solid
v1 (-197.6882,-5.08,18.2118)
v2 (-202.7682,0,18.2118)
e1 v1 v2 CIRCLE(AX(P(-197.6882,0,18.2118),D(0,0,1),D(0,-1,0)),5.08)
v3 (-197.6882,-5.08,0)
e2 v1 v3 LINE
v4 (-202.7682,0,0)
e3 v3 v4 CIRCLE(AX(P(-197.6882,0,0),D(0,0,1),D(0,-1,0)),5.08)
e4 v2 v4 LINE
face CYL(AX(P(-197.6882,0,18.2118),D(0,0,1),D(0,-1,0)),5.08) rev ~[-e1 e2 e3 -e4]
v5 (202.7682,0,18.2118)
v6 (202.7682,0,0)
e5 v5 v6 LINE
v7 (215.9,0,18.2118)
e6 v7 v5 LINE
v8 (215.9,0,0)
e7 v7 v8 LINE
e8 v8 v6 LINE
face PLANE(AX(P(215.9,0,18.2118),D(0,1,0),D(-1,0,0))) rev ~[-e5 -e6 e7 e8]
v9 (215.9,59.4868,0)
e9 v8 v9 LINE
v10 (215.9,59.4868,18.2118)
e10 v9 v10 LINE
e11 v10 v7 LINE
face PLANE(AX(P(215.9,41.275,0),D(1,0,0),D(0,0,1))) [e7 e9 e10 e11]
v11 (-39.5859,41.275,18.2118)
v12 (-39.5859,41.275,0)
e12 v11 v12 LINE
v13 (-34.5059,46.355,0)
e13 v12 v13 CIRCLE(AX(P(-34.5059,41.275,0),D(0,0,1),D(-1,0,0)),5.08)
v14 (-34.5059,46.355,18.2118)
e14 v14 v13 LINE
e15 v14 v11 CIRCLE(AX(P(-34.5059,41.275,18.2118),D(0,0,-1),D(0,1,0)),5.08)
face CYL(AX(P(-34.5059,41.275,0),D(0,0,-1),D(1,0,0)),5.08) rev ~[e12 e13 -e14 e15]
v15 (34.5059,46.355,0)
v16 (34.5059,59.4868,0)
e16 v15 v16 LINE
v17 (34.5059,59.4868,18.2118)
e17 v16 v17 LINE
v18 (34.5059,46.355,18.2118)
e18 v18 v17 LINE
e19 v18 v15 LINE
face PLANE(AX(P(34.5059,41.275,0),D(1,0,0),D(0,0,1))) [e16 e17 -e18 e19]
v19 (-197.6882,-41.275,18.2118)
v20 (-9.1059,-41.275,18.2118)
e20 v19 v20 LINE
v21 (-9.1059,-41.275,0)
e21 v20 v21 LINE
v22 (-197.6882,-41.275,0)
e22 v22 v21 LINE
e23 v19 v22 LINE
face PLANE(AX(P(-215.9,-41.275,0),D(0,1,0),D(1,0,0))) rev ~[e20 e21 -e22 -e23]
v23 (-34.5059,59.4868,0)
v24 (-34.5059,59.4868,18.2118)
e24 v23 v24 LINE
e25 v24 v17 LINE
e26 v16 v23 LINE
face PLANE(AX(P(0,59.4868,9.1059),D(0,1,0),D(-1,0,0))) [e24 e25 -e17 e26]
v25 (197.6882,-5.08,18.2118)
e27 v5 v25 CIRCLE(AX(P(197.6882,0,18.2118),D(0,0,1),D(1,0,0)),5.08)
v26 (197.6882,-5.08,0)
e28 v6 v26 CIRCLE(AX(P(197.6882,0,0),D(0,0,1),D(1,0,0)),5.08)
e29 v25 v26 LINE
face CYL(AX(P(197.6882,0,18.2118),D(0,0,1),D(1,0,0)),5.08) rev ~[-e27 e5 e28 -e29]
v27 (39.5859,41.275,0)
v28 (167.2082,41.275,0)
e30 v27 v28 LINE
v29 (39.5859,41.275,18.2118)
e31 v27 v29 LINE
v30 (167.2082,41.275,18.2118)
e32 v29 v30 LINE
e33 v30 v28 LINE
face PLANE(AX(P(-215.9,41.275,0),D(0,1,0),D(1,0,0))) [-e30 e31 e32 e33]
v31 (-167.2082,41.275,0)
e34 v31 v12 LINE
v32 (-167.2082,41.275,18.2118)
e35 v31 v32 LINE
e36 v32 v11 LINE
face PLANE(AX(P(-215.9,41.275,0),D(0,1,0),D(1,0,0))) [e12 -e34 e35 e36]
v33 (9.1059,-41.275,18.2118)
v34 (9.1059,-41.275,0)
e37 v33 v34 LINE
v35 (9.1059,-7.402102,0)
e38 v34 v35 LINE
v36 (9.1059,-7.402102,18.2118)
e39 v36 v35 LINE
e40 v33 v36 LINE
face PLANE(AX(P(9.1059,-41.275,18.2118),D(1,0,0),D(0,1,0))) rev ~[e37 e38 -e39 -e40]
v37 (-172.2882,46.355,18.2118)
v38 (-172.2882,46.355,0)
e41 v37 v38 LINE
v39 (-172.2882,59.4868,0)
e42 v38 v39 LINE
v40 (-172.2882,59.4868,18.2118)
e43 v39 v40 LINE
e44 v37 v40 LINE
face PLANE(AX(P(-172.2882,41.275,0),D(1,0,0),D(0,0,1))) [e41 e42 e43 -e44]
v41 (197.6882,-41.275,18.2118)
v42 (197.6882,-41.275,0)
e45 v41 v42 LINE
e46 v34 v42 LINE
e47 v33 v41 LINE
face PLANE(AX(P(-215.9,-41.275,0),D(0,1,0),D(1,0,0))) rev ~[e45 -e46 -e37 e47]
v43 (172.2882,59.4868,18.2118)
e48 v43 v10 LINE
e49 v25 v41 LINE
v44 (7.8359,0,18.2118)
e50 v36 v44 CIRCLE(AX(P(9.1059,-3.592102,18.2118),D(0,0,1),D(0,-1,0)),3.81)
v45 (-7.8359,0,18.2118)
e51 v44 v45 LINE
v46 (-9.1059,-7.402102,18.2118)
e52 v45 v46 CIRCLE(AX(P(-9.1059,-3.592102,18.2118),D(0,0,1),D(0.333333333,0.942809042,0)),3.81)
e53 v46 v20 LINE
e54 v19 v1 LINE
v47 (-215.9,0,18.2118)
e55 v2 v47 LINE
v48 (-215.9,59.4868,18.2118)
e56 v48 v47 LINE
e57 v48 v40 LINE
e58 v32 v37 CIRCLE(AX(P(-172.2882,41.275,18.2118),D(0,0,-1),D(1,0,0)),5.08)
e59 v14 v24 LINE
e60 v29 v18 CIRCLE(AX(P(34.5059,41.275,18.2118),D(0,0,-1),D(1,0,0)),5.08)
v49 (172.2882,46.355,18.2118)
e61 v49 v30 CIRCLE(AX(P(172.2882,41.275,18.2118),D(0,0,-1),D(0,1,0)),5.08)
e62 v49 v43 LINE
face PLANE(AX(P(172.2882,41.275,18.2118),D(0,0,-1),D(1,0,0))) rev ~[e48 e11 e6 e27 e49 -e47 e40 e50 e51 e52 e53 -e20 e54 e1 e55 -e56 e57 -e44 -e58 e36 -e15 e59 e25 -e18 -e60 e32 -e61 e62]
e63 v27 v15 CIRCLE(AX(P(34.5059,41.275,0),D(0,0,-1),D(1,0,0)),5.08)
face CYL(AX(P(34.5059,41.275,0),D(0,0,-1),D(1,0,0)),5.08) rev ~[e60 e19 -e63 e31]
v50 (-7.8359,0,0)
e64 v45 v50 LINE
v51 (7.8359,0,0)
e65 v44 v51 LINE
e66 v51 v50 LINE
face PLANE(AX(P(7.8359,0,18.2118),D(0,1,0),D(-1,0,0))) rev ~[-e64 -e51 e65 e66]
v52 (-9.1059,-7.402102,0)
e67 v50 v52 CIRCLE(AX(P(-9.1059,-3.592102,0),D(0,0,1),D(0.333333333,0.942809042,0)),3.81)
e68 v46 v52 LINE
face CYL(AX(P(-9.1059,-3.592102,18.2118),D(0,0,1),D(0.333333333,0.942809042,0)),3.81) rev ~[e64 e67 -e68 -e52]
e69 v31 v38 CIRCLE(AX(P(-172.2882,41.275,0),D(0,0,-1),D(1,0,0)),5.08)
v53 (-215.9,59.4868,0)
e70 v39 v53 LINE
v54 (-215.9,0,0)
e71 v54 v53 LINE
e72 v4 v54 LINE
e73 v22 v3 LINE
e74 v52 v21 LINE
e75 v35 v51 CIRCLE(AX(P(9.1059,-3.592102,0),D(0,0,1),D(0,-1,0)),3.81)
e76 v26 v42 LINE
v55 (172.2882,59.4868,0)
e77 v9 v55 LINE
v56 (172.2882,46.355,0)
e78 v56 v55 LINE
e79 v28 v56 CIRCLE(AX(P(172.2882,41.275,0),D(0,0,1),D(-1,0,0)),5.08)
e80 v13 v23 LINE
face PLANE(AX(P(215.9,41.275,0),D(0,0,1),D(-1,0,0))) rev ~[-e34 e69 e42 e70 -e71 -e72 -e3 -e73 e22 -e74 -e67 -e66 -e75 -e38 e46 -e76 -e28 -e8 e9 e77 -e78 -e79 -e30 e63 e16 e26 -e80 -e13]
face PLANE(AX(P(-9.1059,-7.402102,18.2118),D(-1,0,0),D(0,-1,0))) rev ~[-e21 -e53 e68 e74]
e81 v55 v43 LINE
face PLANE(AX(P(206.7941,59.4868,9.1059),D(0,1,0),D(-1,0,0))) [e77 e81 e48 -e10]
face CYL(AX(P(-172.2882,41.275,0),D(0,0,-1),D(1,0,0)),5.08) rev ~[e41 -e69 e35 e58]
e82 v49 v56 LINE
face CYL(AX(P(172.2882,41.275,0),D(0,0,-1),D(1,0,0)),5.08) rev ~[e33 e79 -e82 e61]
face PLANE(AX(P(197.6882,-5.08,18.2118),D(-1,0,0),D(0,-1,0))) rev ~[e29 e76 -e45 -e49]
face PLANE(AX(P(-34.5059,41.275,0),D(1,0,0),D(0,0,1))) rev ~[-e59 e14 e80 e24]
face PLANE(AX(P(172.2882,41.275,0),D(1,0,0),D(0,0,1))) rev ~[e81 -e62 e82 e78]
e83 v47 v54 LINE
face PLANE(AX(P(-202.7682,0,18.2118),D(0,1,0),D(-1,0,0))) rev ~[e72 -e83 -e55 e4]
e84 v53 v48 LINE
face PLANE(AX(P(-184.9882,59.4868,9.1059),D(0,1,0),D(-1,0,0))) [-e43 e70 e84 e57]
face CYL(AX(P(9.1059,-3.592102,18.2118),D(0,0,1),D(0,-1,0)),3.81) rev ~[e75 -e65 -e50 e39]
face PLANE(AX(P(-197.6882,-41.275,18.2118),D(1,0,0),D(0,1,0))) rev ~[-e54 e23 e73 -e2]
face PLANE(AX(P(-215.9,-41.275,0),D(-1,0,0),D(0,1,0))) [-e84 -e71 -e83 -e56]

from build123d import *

# Parameters (mm, degrees)
F1_W      = 431.8
F1_H      = 82.55
F2_DEPTH  = 18.2118
F4_DEPTH  = 18.2128
F6_DEPTH  = 18.2128
F7_W      = 18.2118
F7_H      = 18.2118
F7_W_2    = 25.4
F8_DEPTH  = 18.2118
F9_R      = 5.08
F10_DEPTH = 18.2128


# Not quite as in the source:
# - a variable given as a bare number and used for a length is read in inches; the dataset says mm whatever the document's units were
# - a feature names something its author has since deleted; it is built from what else it names


with BuildPart() as f2:
    # F1 (on Top) → F2 (new body)
    with BuildSketch(Plane.XY):
        Rectangle(F1_W, F1_H)
    extrude(amount=F2_DEPTH)

    # F3 (on face) → F4 (cut, through all)
    with BuildSketch(Plane.XY.offset(18.2118)):
        Polygon((-215.9, 0), (-215.9, -41.275), (-197.6882, -41.275), (-197.6882, -5.08), (-197.6882, 0), (-202.7682, 0), align=None)
        with BuildLine():
            Line((-197.6882, 0), (-197.6882, -5.08))
            ThreePointArc((-197.6882, -5.08), (-194.0960975516, 3.5921024484), (-202.7682, 0))
            Line((-202.7682, 0), (-197.6882, 0))
        make_face()
        with BuildLine():
            Line((197.6882, 0), (202.7682, 0))
            ThreePointArc((202.7682, 0), (194.0960975516, 3.5921024484), (197.6882, -5.08))
            Line((197.6882, -5.08), (197.6882, 0))
        make_face()
        Polygon((197.6882, -5.08), (197.6882, -41.275), (215.9, -41.275), (215.9, 0), (202.7682, 0), (197.6882, 0), align=None)
    extrude(amount=-F4_DEPTH, mode=Mode.SUBTRACT)

    # F5 (on face) → F6 (cut, through all)
    with BuildSketch(Plane.XY.offset(18.2118)):
        Polygon((-9.1059, -7.4021024484), (-9.1059, -41.275), (9.1059, -41.275), (9.1059, -7.4021024484), (9.1059, 0), (7.8359, 0), (-7.8359, 0), (-9.1059, 0), align=None)
        with BuildLine():
            ThreePointArc((-7.8359, 0), (-12.8610305123, -2.9478239095), (-9.1059, -7.4021024484))
            Line((-9.1059, -7.4021024484), (-9.1059, 0))
            Line((-9.1059, 0), (-7.8359, 0))
        make_face()
        with BuildLine():
            Line((9.1059, 0), (9.1059, -7.4021024484))
            ThreePointArc((9.1059, -7.4021024484), (12.8610305123, -2.9478239095), (7.8359, 0))
            Line((7.8359, 0), (9.1059, 0))
        make_face()
    extrude(amount=-F6_DEPTH, mode=Mode.SUBTRACT)

    # F7 (on face) → F8 (join)
    with BuildSketch(Plane(origin=(0, 41.275, 0), x_dir=(-1, 0, 0), z_dir=(0, 1, 0))):
        with Locations((0, 9.1059)):
            Rectangle(F7_W, F7_H)
        with Locations((-21.8059, 9.1059)):
            Rectangle(F7_W_2, F7_H)
        with Locations((21.8059, 9.1059)):
            Rectangle(F7_W_2, F7_H)
        with Locations((-206.7941, 9.1059)):
            Rectangle(F7_W, F7_H)
        with Locations((-184.9882, 9.1059)):
            Rectangle(F7_W_2, F7_H)
        with Locations((184.9882, 9.1059)):
            Rectangle(F7_W_2, F7_H)
        with Locations((206.7941, 9.1059)):
            Rectangle(F7_W, F7_H)
    extrude(amount=F8_DEPTH)

    # F9 (on face) → F10 (cut, through all)
    with BuildSketch(Plane(origin=(0, 0, 0), x_dir=(1, 0, 0), z_dir=(0, 0, -1))):
        with Locations((34.5059, -41.275)):
            Circle(F9_R)
        with Locations((-34.5059, -41.275)):
            Circle(F9_R)
        with Locations((172.2882, -41.275)):
            Circle(F9_R)
        with Locations((-172.2882, -41.275)):
            Circle(F9_R)
    extrude(amount=-F10_DEPTH, mode=Mode.SUBTRACT)


solid = f2.part
